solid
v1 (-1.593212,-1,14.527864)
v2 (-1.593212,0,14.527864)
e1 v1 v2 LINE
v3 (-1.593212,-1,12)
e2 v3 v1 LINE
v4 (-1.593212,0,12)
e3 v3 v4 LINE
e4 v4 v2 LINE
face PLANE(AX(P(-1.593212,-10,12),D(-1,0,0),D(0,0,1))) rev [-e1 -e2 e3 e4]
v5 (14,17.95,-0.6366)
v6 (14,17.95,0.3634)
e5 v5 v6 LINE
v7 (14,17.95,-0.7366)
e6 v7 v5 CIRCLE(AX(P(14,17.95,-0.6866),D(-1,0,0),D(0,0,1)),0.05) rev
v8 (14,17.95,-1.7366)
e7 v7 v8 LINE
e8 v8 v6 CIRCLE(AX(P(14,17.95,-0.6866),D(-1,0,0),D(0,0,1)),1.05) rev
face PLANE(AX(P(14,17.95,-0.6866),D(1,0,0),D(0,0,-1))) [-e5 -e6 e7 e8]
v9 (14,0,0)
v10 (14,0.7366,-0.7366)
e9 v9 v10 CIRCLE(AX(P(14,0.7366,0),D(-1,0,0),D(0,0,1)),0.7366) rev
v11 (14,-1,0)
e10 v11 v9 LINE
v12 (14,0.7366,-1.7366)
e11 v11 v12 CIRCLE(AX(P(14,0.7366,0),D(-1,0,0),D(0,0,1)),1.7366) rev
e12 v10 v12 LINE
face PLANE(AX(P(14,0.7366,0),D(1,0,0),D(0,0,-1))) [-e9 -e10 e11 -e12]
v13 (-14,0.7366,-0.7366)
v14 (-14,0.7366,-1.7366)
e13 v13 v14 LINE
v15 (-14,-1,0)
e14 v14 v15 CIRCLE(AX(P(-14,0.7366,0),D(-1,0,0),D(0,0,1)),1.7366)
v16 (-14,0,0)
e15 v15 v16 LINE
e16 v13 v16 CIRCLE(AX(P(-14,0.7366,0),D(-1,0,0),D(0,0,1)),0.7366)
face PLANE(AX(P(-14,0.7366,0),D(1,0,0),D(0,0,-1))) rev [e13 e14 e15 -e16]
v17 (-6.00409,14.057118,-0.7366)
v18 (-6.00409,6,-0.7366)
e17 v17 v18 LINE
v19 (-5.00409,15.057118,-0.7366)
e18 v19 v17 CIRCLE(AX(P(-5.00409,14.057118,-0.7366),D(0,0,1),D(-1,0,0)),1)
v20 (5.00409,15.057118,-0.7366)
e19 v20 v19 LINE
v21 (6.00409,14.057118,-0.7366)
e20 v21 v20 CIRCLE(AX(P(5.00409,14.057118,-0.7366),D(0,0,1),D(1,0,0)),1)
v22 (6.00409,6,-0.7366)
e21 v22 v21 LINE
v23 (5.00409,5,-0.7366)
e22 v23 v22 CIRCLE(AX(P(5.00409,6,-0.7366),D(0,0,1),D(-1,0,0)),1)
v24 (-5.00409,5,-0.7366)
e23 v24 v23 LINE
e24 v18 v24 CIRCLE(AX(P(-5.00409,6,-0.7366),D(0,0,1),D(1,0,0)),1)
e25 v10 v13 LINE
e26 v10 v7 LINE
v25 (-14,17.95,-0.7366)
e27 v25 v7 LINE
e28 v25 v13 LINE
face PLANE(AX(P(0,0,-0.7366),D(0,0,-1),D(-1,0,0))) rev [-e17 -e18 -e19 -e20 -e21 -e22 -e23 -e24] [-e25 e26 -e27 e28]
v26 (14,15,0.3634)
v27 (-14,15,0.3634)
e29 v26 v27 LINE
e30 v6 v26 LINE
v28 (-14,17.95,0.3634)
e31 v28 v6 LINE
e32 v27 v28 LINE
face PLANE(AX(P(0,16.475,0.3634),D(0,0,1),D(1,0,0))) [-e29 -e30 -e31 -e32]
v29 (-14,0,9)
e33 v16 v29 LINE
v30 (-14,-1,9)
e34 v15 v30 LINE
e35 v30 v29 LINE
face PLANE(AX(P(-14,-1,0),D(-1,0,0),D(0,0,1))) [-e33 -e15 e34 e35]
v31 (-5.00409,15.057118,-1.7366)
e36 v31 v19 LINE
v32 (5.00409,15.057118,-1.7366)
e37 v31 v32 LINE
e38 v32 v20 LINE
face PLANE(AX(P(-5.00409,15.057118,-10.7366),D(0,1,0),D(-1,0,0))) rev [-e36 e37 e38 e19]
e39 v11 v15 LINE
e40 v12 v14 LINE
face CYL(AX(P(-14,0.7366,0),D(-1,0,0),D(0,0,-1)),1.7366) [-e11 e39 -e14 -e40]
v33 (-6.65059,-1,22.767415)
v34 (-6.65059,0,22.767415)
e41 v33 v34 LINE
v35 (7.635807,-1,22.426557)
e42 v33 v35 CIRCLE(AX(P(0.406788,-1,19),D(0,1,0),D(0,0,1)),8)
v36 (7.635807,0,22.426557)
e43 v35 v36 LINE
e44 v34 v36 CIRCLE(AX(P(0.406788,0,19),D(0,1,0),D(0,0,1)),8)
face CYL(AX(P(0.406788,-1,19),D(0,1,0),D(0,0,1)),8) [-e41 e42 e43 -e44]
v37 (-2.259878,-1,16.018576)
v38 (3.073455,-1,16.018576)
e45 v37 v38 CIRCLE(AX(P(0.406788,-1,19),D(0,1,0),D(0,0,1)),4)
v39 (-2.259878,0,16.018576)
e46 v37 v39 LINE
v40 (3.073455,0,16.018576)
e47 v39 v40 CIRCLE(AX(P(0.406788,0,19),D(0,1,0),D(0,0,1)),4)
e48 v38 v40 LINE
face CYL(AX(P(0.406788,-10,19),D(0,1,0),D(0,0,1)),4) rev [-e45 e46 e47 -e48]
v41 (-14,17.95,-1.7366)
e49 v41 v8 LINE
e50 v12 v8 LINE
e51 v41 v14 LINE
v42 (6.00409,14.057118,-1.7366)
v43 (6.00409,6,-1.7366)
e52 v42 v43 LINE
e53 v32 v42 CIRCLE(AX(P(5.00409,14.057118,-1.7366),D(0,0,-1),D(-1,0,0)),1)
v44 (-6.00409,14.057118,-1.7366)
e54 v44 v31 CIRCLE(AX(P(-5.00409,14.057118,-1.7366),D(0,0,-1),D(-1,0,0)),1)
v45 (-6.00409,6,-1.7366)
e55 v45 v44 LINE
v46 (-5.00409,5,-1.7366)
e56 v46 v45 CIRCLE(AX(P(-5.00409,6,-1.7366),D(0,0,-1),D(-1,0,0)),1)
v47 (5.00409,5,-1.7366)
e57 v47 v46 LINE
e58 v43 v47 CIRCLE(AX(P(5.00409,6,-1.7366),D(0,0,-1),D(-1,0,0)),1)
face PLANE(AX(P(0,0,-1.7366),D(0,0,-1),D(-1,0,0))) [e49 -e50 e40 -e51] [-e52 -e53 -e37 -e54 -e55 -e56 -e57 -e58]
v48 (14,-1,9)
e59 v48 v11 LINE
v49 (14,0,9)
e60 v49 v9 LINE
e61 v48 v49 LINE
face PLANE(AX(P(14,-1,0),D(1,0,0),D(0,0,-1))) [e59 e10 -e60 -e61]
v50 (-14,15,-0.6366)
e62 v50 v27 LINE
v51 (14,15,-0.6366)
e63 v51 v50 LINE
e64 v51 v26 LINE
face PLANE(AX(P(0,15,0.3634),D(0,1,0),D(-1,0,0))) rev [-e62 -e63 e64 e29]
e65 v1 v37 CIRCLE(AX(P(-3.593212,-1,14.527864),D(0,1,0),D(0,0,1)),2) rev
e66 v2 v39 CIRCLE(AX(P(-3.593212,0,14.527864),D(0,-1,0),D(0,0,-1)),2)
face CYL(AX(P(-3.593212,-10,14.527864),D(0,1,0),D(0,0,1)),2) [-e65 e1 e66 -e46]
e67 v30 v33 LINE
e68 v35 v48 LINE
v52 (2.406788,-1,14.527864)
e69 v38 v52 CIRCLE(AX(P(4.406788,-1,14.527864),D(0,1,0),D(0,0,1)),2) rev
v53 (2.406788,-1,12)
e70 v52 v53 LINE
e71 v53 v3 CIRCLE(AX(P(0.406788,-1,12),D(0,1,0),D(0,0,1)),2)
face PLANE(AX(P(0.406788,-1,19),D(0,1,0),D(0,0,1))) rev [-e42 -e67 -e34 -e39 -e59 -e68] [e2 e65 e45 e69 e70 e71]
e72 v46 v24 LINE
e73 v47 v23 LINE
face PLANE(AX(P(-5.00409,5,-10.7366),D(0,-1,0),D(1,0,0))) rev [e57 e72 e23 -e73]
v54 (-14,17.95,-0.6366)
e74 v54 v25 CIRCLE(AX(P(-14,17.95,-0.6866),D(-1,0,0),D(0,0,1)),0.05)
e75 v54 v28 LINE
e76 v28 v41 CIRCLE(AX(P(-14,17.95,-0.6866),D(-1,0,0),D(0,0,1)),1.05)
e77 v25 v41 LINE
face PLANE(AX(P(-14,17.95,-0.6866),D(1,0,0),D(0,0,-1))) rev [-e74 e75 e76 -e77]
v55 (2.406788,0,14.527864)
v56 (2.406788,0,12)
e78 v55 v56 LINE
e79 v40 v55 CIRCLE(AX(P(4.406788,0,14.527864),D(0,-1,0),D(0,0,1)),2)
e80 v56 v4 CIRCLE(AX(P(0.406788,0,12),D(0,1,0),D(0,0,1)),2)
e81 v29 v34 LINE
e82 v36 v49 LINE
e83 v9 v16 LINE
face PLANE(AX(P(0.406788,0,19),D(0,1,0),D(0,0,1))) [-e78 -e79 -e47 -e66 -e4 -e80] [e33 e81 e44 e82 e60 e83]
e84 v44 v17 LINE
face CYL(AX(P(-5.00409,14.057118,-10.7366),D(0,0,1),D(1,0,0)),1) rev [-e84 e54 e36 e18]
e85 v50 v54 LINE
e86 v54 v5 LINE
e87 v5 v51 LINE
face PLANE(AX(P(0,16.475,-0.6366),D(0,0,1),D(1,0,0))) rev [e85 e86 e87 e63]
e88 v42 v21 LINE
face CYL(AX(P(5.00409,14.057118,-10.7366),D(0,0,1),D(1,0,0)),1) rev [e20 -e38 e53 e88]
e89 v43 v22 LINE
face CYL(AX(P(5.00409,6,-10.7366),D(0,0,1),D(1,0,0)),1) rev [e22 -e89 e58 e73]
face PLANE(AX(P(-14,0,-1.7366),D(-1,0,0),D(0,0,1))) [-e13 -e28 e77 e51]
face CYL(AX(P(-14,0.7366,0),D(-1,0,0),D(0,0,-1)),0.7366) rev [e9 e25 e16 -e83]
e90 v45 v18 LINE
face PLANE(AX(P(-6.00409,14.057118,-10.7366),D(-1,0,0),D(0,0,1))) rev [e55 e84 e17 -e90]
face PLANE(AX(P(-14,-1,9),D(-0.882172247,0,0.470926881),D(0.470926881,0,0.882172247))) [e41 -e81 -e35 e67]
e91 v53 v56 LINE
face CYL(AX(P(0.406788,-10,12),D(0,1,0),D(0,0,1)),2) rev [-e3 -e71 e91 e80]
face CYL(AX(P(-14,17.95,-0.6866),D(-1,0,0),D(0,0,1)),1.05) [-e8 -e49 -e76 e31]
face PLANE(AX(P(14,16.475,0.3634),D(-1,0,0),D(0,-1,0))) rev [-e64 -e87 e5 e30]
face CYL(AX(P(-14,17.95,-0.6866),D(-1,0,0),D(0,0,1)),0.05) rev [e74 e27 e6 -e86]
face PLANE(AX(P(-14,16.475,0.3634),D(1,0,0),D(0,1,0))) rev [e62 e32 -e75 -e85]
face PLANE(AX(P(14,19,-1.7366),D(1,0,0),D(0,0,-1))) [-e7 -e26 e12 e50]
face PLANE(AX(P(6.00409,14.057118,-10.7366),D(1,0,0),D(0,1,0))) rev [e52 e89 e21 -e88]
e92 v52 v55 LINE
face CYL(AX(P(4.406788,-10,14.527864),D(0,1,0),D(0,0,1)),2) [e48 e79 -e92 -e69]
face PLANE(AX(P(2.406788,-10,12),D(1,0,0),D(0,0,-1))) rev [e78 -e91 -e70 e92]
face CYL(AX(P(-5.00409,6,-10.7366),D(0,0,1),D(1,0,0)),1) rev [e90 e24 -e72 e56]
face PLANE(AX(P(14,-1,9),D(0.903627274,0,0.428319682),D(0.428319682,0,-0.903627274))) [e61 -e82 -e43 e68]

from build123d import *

# Parameters (mm, degrees)
BASE_FLANGE1_DEPTH = 1
EDGE_FLANGE1_DEPTH = 28
HEM1_START         = -14
HEM1_DEPTH         = 28
HEM1_2_DEPTH       = 28
CUT_EXTRUDE1_DEPTH = 10
CUT_EXTRUDE3_DEPTH = 10


# Read off the part's stored shape, not the designer's step: Hem1
# Sheet-metal steps are written as plain solids
with BuildPart() as part:
    # Sketch1 → Base-Flange1 (new body)
    with BuildSketch(Plane(origin=(0, 0, 0), x_dir=(1, 0, 0), z_dir=(0, 1, 0))):
        with BuildLine():
            Line((-14, 0), (14, 0))
            Line((14, 0), (14, -9))
            Line((14, -9), (7.635806501, -22.426557457))
            ThreePointArc((7.635806501, -22.426557457), (0.597605148, -26.997723985), (-6.650589662, -22.767415048))
            Line((-6.650589662, -22.767415048), (-14, -9))
            Line((-14, -9), (-14, 0))
        make_face()
    extrude(amount=-BASE_FLANGE1_DEPTH)

    # Edge-Flange1 section (across the edge) → Edge-Flange1 (add)
    with BuildSketch(Plane(origin=(14, 0, -0.7366), x_dir=(0, 0, 1), z_dir=(-1, 0, 0))):
        with BuildLine():
            Line((-1, 0.7366), (-1, 19))
            Line((-1, 19), (0, 19))
            Line((0, 19), (0, 0.7366))
            ThreePointArc((0, 0.7366), (0.215745145, 0.215745145), (0.7366, 0))
            Line((0.7366, 0), (0.7366, -1))
            ThreePointArc((0.7366, -1), (-0.491361636, -0.491361636), (-1, 0.7366))
        make_face()
    extrude(amount=EDGE_FLANGE1_DEPTH)

    # Hem1 outline → Hem1 (cut)
    with BuildSketch(Plane.YZ.offset(HEM1_START)):
        with BuildLine():
            Line((19, -0.7366), (18.998808848, -0.7366))
            ThreePointArc((18.998808848, -0.7366), (18.674568837, -1.446534208), (17.95, -1.7366))
            Line((17.95, -1.7366), (19, -1.7366))
            Line((19, -1.7366), (19, -0.7366))
        make_face()
    extrude(amount=HEM1_DEPTH, mode=Mode.SUBTRACT)

    # Hem1 2 outline → Hem1 2 (add)
    with BuildSketch(Plane.YZ.offset(HEM1_START)):
        with BuildLine():
            Line((15, 0.3634), (15, -0.6366))
            Line((15, -0.6366), (17.95, -0.6366))
            ThreePointArc((17.95, -0.6366), (18, -0.6866), (17.95, -0.7366))
            Line((17.95, -0.7366), (18.998808848, -0.7366))
            ThreePointArc((18.998808848, -0.7366), (18.709934208, 0.037968837), (17.95, 0.3634))
            Line((17.95, 0.3634), (15, 0.3634))
        make_face()
    extrude(amount=HEM1_2_DEPTH)

    # Sketch15 → Cut-Extrude1 (cut)
    with BuildSketch(Plane.XY.offset(-0.7366)):
        with BuildLine():
            Line((-5.004090335, 15.057117645), (5.004090335, 15.057117645))
            ThreePointArc((5.004090335, 15.057117645), (5.711197117, 14.764224427), (6.004090335, 14.057117645))
            Line((6.004090335, 14.057117645), (6.004090335, 6))
            ThreePointArc((6.004090335, 6), (5.711197117, 5.292893219), (5.004090335, 5))
            Line((5.004090335, 5), (-5.004090335, 5))
            ThreePointArc((-5.004090335, 5), (-5.711197117, 5.292893219), (-6.004090335, 6))
            Line((-6.004090335, 6), (-6.004090335, 14.057117645))
            ThreePointArc((-6.004090335, 14.057117645), (-5.711197117, 14.764224427), (-5.004090335, 15.057117645))
        make_face()
    extrude(amount=-CUT_EXTRUDE1_DEPTH, mode=Mode.SUBTRACT)

    # Sketch16 → Cut-Extrude3 (cut)
    with BuildSketch(Plane(origin=(0, 0, 0), x_dir=(1, 0, 0), z_dir=(0, 1, 0))):
        with BuildLine():
            Line((-1.593211689, -12), (-1.593211689, -14.527864045))
            ThreePointArc((-1.593211689, -14.527864045), (-1.767469831, -15.344360626), (-2.259878356, -16.01857603))
            ThreePointArc((-2.259878356, -16.01857603), (0.406788311, -23), (3.073454977, -16.01857603))
            ThreePointArc((3.073454977, -16.01857603), (2.581046452, -15.344360626), (2.406788311, -14.527864045))
            Line((2.406788311, -14.527864045), (2.406788311, -12))
            ThreePointArc((2.406788311, -12), (0.406788311, -10), (-1.593211689, -12))
        make_face()
    extrude(amount=-CUT_EXTRUDE3_DEPTH, mode=Mode.SUBTRACT)


solid = part.part
